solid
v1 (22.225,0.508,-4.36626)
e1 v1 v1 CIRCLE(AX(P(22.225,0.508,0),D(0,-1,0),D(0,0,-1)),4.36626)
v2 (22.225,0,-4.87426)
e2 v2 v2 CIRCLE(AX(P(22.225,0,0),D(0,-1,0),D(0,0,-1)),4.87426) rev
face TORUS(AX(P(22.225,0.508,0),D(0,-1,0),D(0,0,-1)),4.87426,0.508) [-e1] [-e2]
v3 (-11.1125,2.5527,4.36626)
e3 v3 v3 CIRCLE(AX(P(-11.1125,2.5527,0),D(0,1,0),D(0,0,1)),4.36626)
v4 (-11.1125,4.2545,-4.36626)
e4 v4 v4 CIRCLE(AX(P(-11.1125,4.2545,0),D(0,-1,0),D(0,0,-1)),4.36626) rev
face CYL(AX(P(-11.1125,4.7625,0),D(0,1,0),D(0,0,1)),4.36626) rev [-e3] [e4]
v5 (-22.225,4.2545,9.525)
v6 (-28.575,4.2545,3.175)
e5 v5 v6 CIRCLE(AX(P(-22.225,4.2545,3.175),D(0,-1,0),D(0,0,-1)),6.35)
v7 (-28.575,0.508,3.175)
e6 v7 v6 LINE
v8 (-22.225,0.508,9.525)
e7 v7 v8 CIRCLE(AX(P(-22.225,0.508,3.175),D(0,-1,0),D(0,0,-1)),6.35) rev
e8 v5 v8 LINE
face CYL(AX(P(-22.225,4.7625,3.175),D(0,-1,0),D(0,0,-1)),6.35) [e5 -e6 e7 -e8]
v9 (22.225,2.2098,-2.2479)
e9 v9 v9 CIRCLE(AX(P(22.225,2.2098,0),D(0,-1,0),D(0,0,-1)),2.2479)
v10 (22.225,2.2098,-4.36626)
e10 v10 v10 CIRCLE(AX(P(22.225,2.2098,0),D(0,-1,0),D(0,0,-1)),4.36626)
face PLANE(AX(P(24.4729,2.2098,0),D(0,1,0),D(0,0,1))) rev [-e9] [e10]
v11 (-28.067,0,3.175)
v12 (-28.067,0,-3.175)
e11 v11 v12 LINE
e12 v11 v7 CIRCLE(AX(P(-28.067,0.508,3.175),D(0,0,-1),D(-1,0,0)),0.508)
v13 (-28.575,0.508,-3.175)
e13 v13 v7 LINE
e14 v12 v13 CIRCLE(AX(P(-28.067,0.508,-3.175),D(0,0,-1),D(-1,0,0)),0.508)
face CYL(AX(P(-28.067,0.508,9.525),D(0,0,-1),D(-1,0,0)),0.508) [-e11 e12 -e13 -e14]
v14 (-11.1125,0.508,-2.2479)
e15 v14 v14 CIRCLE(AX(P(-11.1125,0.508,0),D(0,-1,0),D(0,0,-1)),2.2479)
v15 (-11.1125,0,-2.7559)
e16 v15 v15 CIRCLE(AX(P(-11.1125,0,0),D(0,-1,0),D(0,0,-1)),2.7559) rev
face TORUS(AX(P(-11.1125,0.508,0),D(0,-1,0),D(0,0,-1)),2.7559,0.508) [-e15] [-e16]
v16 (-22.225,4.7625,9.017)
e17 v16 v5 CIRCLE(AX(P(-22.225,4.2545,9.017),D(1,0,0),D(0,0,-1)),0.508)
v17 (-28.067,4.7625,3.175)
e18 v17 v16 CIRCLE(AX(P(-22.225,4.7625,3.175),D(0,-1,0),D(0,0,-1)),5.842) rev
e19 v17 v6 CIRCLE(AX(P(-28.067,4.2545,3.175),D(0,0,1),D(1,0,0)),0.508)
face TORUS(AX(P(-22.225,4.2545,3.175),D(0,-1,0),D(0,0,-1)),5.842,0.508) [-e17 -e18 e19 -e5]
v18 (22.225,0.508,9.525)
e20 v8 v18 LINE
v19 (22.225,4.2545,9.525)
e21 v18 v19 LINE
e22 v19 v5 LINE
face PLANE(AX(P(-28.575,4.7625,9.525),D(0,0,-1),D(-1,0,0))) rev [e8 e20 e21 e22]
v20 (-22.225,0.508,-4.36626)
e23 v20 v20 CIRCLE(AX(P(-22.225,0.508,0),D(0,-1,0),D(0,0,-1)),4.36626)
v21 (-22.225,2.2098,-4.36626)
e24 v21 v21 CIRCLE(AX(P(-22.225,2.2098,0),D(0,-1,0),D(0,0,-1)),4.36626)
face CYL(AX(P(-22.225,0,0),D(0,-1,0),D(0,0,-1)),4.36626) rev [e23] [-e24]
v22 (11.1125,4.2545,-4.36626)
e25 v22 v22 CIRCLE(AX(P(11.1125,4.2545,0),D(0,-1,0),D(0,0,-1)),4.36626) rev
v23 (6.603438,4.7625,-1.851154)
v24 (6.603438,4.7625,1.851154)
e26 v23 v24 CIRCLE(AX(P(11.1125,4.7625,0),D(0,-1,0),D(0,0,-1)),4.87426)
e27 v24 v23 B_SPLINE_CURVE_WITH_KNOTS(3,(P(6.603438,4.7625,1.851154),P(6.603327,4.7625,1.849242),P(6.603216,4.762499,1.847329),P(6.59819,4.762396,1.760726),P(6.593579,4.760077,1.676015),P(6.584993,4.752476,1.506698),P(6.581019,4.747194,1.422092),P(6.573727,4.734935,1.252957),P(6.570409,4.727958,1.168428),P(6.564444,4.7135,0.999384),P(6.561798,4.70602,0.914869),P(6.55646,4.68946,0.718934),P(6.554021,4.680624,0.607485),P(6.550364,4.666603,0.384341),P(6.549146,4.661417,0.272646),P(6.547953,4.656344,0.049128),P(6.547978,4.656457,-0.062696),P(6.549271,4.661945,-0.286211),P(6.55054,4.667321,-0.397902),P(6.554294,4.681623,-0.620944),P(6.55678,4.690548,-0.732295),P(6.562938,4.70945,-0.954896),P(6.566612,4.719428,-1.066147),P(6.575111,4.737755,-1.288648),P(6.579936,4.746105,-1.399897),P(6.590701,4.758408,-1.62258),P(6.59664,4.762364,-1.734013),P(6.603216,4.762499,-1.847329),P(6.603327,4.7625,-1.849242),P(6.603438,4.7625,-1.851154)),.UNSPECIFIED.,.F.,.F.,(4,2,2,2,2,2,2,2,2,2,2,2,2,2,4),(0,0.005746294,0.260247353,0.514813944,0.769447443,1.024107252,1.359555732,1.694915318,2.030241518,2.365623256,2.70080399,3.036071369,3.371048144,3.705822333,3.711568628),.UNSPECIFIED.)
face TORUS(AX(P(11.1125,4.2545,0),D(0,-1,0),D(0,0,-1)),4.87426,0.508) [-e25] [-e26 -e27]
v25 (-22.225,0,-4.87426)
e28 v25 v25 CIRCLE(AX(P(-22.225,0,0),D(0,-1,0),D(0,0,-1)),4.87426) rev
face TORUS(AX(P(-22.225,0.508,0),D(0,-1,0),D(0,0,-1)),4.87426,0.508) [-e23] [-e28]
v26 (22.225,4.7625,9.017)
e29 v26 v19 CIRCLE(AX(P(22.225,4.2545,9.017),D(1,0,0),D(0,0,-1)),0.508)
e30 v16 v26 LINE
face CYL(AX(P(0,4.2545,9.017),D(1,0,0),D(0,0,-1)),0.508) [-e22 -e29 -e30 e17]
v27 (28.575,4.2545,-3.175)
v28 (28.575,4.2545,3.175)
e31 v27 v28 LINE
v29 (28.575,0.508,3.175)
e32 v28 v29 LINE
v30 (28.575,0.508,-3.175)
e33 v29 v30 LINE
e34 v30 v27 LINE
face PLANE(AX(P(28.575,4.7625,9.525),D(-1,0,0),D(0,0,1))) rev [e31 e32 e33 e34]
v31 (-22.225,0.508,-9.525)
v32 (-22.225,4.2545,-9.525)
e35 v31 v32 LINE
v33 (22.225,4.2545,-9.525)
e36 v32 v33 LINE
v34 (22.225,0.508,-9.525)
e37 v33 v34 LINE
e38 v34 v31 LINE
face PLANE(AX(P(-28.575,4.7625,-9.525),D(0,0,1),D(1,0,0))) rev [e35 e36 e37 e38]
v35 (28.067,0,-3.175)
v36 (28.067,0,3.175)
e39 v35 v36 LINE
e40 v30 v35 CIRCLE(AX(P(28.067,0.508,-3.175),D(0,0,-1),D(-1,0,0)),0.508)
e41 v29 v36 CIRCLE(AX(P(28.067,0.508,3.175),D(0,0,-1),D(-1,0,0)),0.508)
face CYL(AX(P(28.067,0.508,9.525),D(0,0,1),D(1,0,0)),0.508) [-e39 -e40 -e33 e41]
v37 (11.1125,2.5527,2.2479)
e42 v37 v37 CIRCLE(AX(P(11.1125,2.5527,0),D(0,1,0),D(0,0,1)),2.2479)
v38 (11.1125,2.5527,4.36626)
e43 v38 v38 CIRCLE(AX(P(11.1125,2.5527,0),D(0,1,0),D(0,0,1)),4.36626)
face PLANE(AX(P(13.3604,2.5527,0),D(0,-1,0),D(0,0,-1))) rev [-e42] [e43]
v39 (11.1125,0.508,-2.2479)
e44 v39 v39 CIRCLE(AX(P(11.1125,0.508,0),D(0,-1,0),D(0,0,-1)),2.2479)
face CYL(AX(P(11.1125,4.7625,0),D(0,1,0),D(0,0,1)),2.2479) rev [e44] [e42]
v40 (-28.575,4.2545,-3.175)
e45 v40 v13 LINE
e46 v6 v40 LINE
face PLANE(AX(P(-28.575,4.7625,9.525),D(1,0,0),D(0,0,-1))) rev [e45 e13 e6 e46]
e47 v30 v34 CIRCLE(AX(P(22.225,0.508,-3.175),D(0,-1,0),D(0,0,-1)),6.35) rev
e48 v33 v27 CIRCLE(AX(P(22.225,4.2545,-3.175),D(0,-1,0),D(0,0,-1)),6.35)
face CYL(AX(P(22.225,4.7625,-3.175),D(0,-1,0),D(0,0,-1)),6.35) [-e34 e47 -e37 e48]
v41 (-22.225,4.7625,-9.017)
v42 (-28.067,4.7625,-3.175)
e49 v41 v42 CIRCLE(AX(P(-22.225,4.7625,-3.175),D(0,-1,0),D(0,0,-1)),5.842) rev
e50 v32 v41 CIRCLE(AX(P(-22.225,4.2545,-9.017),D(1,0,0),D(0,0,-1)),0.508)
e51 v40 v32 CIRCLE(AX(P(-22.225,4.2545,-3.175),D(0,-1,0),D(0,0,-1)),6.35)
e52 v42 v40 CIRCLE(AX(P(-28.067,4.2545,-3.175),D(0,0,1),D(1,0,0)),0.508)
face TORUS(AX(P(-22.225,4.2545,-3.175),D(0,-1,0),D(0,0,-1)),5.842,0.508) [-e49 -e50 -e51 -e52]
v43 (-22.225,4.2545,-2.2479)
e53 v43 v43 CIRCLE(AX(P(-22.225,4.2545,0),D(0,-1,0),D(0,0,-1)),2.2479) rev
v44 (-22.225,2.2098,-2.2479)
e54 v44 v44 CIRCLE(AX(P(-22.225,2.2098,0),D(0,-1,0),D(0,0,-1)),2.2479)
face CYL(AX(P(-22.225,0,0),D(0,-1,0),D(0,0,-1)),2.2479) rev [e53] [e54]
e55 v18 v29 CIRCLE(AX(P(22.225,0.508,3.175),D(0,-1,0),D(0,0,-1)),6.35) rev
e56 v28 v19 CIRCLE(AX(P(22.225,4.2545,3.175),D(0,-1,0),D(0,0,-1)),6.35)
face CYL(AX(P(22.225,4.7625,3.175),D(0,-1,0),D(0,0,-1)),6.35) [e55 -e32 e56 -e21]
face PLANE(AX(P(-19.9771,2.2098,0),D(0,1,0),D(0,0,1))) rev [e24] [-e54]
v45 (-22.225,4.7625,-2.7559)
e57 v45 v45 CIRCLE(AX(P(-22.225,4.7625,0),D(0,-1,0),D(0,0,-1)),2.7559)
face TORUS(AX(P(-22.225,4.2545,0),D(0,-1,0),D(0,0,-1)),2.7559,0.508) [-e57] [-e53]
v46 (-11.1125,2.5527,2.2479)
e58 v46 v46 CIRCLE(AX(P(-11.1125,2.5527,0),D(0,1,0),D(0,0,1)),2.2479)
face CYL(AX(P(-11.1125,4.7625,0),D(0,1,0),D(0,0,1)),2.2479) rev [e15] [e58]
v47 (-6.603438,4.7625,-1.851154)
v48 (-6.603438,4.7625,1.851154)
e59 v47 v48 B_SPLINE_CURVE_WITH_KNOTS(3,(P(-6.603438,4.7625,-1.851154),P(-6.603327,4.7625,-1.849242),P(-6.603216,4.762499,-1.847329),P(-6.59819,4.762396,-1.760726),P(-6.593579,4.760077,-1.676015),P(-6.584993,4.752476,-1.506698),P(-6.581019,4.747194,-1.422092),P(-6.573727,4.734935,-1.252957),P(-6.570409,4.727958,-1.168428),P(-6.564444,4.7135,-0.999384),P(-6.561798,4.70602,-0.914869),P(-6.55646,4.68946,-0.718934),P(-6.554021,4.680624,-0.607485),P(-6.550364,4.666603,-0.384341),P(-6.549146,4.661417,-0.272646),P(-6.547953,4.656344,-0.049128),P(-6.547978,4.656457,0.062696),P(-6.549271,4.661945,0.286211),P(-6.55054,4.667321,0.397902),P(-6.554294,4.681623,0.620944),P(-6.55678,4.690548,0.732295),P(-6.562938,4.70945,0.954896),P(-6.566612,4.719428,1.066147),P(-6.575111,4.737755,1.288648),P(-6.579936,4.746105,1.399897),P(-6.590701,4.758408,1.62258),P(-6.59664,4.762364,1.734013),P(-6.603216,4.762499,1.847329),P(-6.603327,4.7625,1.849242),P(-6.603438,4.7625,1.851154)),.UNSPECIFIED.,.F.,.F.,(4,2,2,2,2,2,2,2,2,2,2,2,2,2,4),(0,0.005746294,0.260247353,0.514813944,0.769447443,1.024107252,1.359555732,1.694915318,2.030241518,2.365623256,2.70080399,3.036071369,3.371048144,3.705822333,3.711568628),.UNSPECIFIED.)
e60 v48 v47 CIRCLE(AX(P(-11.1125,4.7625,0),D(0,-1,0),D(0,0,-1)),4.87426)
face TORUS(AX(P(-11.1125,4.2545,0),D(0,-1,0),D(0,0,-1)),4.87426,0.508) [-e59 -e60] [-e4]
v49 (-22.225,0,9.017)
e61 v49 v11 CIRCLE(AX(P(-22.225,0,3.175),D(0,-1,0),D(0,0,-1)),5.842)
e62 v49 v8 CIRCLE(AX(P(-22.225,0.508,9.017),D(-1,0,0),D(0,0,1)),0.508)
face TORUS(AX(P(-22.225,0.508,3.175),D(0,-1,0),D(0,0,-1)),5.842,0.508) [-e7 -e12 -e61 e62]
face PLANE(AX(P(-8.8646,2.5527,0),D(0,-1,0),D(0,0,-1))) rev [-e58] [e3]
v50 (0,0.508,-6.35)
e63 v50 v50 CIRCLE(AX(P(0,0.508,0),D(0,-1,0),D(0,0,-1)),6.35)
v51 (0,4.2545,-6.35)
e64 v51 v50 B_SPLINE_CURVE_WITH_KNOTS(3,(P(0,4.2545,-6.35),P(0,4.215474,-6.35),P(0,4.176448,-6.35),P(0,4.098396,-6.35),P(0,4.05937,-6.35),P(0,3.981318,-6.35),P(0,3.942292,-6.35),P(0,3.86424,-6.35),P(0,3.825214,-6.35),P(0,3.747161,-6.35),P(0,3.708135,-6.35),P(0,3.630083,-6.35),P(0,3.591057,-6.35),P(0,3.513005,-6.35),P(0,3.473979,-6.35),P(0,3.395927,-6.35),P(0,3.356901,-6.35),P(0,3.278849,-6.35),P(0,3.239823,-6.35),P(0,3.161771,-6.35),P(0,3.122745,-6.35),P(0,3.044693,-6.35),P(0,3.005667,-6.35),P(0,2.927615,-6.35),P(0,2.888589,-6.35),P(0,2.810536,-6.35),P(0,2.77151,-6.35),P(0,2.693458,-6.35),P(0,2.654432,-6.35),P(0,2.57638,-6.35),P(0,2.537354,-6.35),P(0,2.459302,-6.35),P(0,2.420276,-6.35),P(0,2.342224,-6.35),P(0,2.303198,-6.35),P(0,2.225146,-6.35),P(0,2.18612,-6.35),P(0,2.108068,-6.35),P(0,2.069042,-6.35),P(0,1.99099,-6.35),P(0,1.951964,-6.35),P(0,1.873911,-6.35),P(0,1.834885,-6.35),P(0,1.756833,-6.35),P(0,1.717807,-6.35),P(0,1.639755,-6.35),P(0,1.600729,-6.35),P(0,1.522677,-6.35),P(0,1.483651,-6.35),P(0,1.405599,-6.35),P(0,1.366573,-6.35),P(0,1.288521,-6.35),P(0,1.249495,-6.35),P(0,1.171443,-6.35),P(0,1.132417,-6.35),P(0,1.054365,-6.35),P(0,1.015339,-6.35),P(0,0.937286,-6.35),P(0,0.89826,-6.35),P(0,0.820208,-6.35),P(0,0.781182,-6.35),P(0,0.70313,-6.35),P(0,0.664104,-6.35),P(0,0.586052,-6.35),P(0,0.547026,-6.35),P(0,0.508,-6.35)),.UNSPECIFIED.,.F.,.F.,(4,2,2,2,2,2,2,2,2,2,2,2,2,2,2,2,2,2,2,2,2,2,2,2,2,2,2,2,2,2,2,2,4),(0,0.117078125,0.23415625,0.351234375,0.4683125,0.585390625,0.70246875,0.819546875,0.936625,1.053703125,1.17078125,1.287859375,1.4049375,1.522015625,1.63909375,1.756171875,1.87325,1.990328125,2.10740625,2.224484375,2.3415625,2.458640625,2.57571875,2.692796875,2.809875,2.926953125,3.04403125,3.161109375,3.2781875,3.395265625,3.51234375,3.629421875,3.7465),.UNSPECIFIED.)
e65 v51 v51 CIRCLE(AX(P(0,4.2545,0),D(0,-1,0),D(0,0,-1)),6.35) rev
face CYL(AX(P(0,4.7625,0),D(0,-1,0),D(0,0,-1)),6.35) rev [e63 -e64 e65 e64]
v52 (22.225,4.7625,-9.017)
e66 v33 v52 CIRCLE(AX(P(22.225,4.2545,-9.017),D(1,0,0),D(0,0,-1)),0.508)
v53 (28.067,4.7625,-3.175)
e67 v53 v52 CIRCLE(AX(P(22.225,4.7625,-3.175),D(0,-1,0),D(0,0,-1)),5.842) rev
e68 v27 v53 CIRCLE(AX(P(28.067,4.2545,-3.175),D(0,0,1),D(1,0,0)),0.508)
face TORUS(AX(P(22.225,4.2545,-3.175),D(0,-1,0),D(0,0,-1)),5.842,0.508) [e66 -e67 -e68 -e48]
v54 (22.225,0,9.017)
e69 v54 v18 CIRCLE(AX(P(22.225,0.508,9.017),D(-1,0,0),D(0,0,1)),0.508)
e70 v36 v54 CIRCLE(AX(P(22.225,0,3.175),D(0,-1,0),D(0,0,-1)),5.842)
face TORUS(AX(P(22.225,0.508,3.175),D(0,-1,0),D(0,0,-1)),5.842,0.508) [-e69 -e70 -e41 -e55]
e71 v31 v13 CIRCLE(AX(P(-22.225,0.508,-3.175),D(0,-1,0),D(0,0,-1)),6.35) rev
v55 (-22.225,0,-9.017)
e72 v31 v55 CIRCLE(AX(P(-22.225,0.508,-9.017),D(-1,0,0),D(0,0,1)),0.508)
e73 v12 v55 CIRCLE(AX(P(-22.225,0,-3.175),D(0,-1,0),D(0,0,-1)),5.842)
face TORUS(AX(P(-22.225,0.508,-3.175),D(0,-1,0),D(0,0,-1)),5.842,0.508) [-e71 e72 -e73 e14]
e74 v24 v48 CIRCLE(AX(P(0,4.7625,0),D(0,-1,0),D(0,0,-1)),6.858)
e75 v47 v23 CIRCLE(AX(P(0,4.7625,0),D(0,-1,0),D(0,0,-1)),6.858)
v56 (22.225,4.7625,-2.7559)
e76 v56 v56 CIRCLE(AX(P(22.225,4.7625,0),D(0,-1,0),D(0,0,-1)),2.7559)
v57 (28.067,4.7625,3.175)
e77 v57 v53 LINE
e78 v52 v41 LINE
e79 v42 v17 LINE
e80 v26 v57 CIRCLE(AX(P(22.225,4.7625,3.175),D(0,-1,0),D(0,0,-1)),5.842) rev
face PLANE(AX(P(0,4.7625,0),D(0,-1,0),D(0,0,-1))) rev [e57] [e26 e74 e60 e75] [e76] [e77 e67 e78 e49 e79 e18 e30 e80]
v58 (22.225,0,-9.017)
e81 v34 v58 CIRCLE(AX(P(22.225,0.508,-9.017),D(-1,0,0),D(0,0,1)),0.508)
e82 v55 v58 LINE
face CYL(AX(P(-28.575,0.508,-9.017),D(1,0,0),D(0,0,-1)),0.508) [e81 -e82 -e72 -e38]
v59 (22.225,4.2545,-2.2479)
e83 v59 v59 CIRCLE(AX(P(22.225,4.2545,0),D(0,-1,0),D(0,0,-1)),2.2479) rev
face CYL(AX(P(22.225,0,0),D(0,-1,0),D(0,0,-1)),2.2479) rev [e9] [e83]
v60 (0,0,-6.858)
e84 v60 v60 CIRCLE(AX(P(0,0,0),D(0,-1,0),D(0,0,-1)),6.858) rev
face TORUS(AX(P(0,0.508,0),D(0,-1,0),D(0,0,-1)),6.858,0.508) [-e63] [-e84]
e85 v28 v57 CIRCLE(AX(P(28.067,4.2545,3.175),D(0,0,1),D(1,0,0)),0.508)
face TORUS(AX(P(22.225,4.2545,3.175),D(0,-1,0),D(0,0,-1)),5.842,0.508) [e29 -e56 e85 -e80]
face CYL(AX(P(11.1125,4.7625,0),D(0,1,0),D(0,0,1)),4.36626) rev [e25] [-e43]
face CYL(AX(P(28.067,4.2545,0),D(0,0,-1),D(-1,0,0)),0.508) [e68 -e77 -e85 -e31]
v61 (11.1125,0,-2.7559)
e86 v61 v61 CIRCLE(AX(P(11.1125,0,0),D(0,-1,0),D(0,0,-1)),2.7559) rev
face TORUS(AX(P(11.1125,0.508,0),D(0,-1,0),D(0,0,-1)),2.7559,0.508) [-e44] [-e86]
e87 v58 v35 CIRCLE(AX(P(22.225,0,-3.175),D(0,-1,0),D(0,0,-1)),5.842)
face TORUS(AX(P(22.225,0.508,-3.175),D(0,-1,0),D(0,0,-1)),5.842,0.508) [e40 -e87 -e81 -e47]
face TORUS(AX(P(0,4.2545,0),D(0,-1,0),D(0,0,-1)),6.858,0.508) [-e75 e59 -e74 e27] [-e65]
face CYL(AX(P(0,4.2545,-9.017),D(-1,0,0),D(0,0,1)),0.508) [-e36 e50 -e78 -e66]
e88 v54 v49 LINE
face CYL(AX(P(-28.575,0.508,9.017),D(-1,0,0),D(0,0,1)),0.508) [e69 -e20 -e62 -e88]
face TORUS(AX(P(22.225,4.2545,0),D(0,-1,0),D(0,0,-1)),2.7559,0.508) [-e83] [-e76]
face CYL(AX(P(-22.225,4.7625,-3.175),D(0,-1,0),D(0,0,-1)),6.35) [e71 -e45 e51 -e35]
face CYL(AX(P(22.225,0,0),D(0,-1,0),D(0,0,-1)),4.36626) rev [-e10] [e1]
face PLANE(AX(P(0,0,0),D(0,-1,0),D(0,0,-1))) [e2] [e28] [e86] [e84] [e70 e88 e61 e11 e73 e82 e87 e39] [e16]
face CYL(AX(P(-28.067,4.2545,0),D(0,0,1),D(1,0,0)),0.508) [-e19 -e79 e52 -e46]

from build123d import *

# Parameters (mm, degrees)
SKETCH1_W                                      = 57.15
SKETCH1_H                                      = 19.05
SKETCH1_R                                      = 6.35
BOSS_EXTRUDE1_DEPTH                            = 4.7625
CBORE_FOR_8_BUTTON_HEAD_CAP_SCREW1_D           = 4.4958
CBORE_FOR_8_BUTTON_HEAD_CAP_SCREW1_CBORE_D     = 8.73252
CBORE_FOR_8_BUTTON_HEAD_CAP_SCREW1_CBORE_DEPTH = 2.2098
CBORE_FOR_8_BUTTON_HEAD_CAP_SCREW2_D           = 4.4958
CBORE_FOR_8_BUTTON_HEAD_CAP_SCREW2_CBORE_D     = 8.73252
CBORE_FOR_8_BUTTON_HEAD_CAP_SCREW2_CBORE_DEPTH = 2.2098
FILLET1_R                                      = 6.35
FILLET2_R                                      = 0.508


with BuildPart() as part:
    # Sketch1 → Boss-Extrude1 (new body)
    with BuildSketch(Plane(origin=(0, 0, 0), x_dir=(1, 0, 0), z_dir=(0, 1, 0))):
        Rectangle(SKETCH1_W, SKETCH1_H)
        with Locations(Location((0, 0, 0), (0, 0, 90))):
            Circle(SKETCH1_R, mode=Mode.SUBTRACT)
    extrude(amount=BOSS_EXTRUDE1_DEPTH)

    # CBORE for #8 Button Head Cap Screw1 (through all)
    with Locations(Plane(origin=(0, 4.7625, 0), x_dir=(1, 0, 0), z_dir=(0, 1, 0))):
        with Locations((-11.1125, 0), (11.1125, 0)):
            CounterBoreHole(CBORE_FOR_8_BUTTON_HEAD_CAP_SCREW1_D / 2, CBORE_FOR_8_BUTTON_HEAD_CAP_SCREW1_CBORE_D / 2, CBORE_FOR_8_BUTTON_HEAD_CAP_SCREW1_CBORE_DEPTH)

    # CBORE for #8 Button Head Cap Screw2 (through all)
    with Locations(Plane(origin=(0, 0, 0), x_dir=(-1, 0, 0), z_dir=(0, -1, 0))):
        with Locations((22.225, 0), (-22.225, 0)):
            CounterBoreHole(CBORE_FOR_8_BUTTON_HEAD_CAP_SCREW2_D / 2, CBORE_FOR_8_BUTTON_HEAD_CAP_SCREW2_CBORE_D / 2, CBORE_FOR_8_BUTTON_HEAD_CAP_SCREW2_CBORE_DEPTH)

    # Fillet1
    fillet1_edges = [part.edges().sort_by_distance(p)[0] for p in [
        (28.575, 2.38125, 9.525),
        (-28.575, 2.38125, 9.525),
        (-28.575, 2.38125, -9.525),
        (28.575, 2.38125, -9.525),
    ]]
    fillet(fillet1_edges, radius=FILLET1_R)

    # Fillet2
    # the kernel refuses this fillet: 0.508 mm, written as the material it takes off along each edge
    with BuildSketch(Plane(origin=(0, 0, 0), x_dir=(0, 0, -1), z_dir=(1, 0, 0))) as fillet2_piece_1:
        with BuildLine():
            CenterArc((6.35 + FILLET2_R, FILLET2_R), FILLET2_R, 180, 90)
            Line((6.35, FILLET2_R), (6.35, 0))
            Line((6.35, 0), (6.35 + FILLET2_R, 0))
        make_face()
    revolve(axis=Axis((0, 0, 0), (0, 1, 0)), mode=Mode.SUBTRACT)
    with BuildSketch(Plane(origin=(0, 4.7625, 0), x_dir=(0, 0, -1), z_dir=(1, 0, 0))) as fillet2_piece_2:
        with BuildLine():
            CenterArc((6.35 + FILLET2_R, -FILLET2_R), FILLET2_R, 90, 90)
            Line((6.35, -FILLET2_R), (6.35, 0))
            Line((6.35, 0), (6.35 + FILLET2_R, 0))
        make_face()
    revolve(axis=Axis((0, 4.7625, 0), (0, 1, 0)), mode=Mode.SUBTRACT)
    with BuildSketch(Plane(origin=(11.1125, 4.7625, 0), x_dir=(1, 0, 0), z_dir=(0, 0, 1))) as fillet2_piece_3:
        with BuildLine():
            CenterArc((4.36626 + FILLET2_R, -FILLET2_R), FILLET2_R, 90, 90)
            Line((4.36626, -FILLET2_R), (4.36626, 0))
            Line((4.36626, 0), (4.36626 + FILLET2_R, 0))
        make_face()
    revolve(axis=Axis((11.1125, 4.7625, 0), (0, 1, 0)), mode=Mode.SUBTRACT)
    with BuildSketch(Plane(origin=(11.1125, 0, 0), x_dir=(-1, 0, 0), z_dir=(0, 0, 1))) as fillet2_piece_4:
        with BuildLine():
            CenterArc((2.2479 + FILLET2_R, -FILLET2_R), FILLET2_R, 90, 90)
            Line((2.2479, -FILLET2_R), (2.2479, 0))
            Line((2.2479, 0), (2.2479 + FILLET2_R, 0))
        make_face()
    revolve(axis=Axis((11.1125, 0, 0), (0, -1, 0)), mode=Mode.SUBTRACT)
    with BuildSketch(Plane(origin=(-11.1125, 4.7625, 0), x_dir=(1, 0, 0), z_dir=(0, 0, 1))) as fillet2_piece_5:
        with BuildLine():
            CenterArc((4.36626 + FILLET2_R, -FILLET2_R), FILLET2_R, 90, 90)
            Line((4.36626, -FILLET2_R), (4.36626, 0))
            Line((4.36626, 0), (4.36626 + FILLET2_R, 0))
        make_face()
    revolve(axis=Axis((-11.1125, 4.7625, 0), (0, 1, 0)), mode=Mode.SUBTRACT)
    with BuildSketch(Plane(origin=(-11.1125, 0, 0), x_dir=(-1, 0, 0), z_dir=(0, 0, 1))) as fillet2_piece_6:
        with BuildLine():
            CenterArc((2.2479 + FILLET2_R, -FILLET2_R), FILLET2_R, 90, 90)
            Line((2.2479, -FILLET2_R), (2.2479, 0))
            Line((2.2479, 0), (2.2479 + FILLET2_R, 0))
        make_face()
    revolve(axis=Axis((-11.1125, 0, 0), (0, -1, 0)), mode=Mode.SUBTRACT)
    with BuildSketch(Plane(origin=(22.225, 0, 0), x_dir=(-1, 0, 0), z_dir=(0, 0, 1))) as fillet2_piece_7:
        with BuildLine():
            CenterArc((4.36626 + FILLET2_R, -FILLET2_R), FILLET2_R, 90, 90)
            Line((4.36626, -FILLET2_R), (4.36626, 0))
            Line((4.36626, 0), (4.36626 + FILLET2_R, 0))
        make_face()
    revolve(axis=Axis((22.225, 0, 0), (0, -1, 0)), mode=Mode.SUBTRACT)
    with BuildSketch(Plane(origin=(22.225, 4.7625, 0), x_dir=(1, 0, 0), z_dir=(0, 0, 1))) as fillet2_piece_8:
        with BuildLine():
            CenterArc((2.2479 + FILLET2_R, -FILLET2_R), FILLET2_R, 90, 90)
            Line((2.2479, -FILLET2_R), (2.2479, 0))
            Line((2.2479, 0), (2.2479 + FILLET2_R, 0))
        make_face()
    revolve(axis=Axis((22.225, 4.7625, 0), (0, 1, 0)), mode=Mode.SUBTRACT)
    with BuildSketch(Plane(origin=(-22.225, 0, 0), x_dir=(-1, 0, 0), z_dir=(0, 0, 1))) as fillet2_piece_9:
        with BuildLine():
            CenterArc((4.36626 + FILLET2_R, -FILLET2_R), FILLET2_R, 90, 90)
            Line((4.36626, -FILLET2_R), (4.36626, 0))
            Line((4.36626, 0), (4.36626 + FILLET2_R, 0))
        make_face()
    revolve(axis=Axis((-22.225, 0, 0), (0, -1, 0)), mode=Mode.SUBTRACT)
    with BuildSketch(Plane(origin=(-22.225, 4.7625, 0), x_dir=(1, 0, 0), z_dir=(0, 0, 1))) as fillet2_piece_10:
        with BuildLine():
            CenterArc((2.2479 + FILLET2_R, -FILLET2_R), FILLET2_R, 90, 90)
            Line((2.2479, -FILLET2_R), (2.2479, 0))
            Line((2.2479, 0), (2.2479 + FILLET2_R, 0))
        make_face()
    revolve(axis=Axis((-22.225, 4.7625, 0), (0, 1, 0)), mode=Mode.SUBTRACT)
    with BuildSketch(Plane(origin=(22.225, 0, -9.525), x_dir=(0, 0, 1), z_dir=(-1, 0, 0)), Plane(origin=(-22.225, 4.7625, 9.525), x_dir=(0, -1, 0), z_dir=(1, 0, 0))) as fillet2_piece_11:
        with BuildLine():
            CenterArc((FILLET2_R, FILLET2_R), FILLET2_R, 180, 90)
            Line((0, FILLET2_R), (0, 0))
            Line((0, 0), (FILLET2_R, 0))
        make_face()
    extrude(amount=44.45, mode=Mode.SUBTRACT)
    with BuildSketch(Plane(origin=(22.225, 4.7625, -9.525), x_dir=(0, 0, 1), z_dir=(-1, 0, 0)), Plane(origin=(-22.225, 0, 9.525), x_dir=(0, 1, 0), z_dir=(1, 0, 0))) as fillet2_piece_12:
        with BuildLine():
            CenterArc((FILLET2_R, -FILLET2_R), FILLET2_R, 90, 90)
            Line((0, -FILLET2_R), (0, 0))
            Line((0, 0), (FILLET2_R, 0))
        make_face()
    extrude(amount=44.45, mode=Mode.SUBTRACT)
    with BuildSketch(Plane(origin=(28.575, 0, 3.175), x_dir=(-1, 0, 0), z_dir=(0, 0, -1)), Plane(origin=(-28.575, 0, -3.175), x_dir=(1, 0, 0), z_dir=(0, 0, 1))) as fillet2_piece_13:
        with BuildLine():
            CenterArc((FILLET2_R, FILLET2_R), FILLET2_R, 180, 90)
            Line((0, FILLET2_R), (0, 0))
            Line((0, 0), (FILLET2_R, 0))
        make_face()
    extrude(amount=6.35, mode=Mode.SUBTRACT)
    with BuildSketch(Plane(origin=(-22.225, 0, 3.175), x_dir=(0, 0, 1), z_dir=(1, 0, 0))) as fillet2_piece_14:
        with BuildLine():
            CenterArc((6.35 - FILLET2_R, -FILLET2_R), FILLET2_R, 0, 90)
            Line((6.35, -FILLET2_R), (6.35, 0))
            Line((6.35, 0), (6.35 - FILLET2_R, 0))
        make_face()
    revolve(axis=Axis((-22.225, 0, 3.175), (0, -1, 0)), revolution_arc=90, mode=Mode.SUBTRACT)
    with BuildSketch(Plane(origin=(-22.225, 0, -3.175), x_dir=(-1, 0, 0), z_dir=(0, 0, 1))) as fillet2_piece_15:
        with BuildLine():
            CenterArc((6.35 - FILLET2_R, -FILLET2_R), FILLET2_R, 0, 90)
            Line((6.35, -FILLET2_R), (6.35, 0))
            Line((6.35, 0), (6.35 - FILLET2_R, 0))
        make_face()
    revolve(axis=Axis((-22.225, 0, -3.175), (0, -1, 0)), revolution_arc=90, mode=Mode.SUBTRACT)
    with BuildSketch(Plane(origin=(22.225, 0, 3.175), x_dir=(0, 0, 1), z_dir=(-1, 0, 0))) as fillet2_piece_16:
        with BuildLine():
            CenterArc((6.35 - FILLET2_R, FILLET2_R), FILLET2_R, 270, 90)
            Line((6.35, FILLET2_R), (6.35, 0))
            Line((6.35, 0), (6.35 - FILLET2_R, 0))
        make_face()
    revolve(axis=Axis((22.225, 0, 3.175), (0, 1, 0)), revolution_arc=90, mode=Mode.SUBTRACT)
    with BuildSketch(Plane(origin=(22.225, 0, -3.175), x_dir=(1, 0, 0), z_dir=(0, 0, 1))) as fillet2_piece_17:
        with BuildLine():
            CenterArc((6.35 - FILLET2_R, FILLET2_R), FILLET2_R, 270, 90)
            Line((6.35, FILLET2_R), (6.35, 0))
            Line((6.35, 0), (6.35 - FILLET2_R, 0))
        make_face()
    revolve(axis=Axis((22.225, 0, -3.175), (0, 1, 0)), revolution_arc=90, mode=Mode.SUBTRACT)
    with BuildSketch(Plane(origin=(28.575, 4.7625, 3.175), x_dir=(-1, 0, 0), z_dir=(0, 0, -1)), Plane(origin=(-28.575, 4.7625, -3.175), x_dir=(1, 0, 0), z_dir=(0, 0, 1))) as fillet2_piece_18:
        with BuildLine():
            CenterArc((FILLET2_R, -FILLET2_R), FILLET2_R, 90, 90)
            Line((0, -FILLET2_R), (0, 0))
            Line((0, 0), (FILLET2_R, 0))
        make_face()
    extrude(amount=6.35, mode=Mode.SUBTRACT)
    with BuildSketch(Plane(origin=(-22.225, 4.7625, 3.175), x_dir=(0, 0, 1), z_dir=(1, 0, 0))) as fillet2_piece_19:
        with BuildLine():
            CenterArc((6.35 - FILLET2_R, FILLET2_R), FILLET2_R, 270, 90)
            Line((6.35 - FILLET2_R, 0), (6.35, 0))
            Line((6.35, 0), (6.35, FILLET2_R))
        make_face()
    revolve(axis=Axis((-22.225, 4.7625, 3.175), (0, -1, 0)), revolution_arc=90, mode=Mode.SUBTRACT)
    with BuildSketch(Plane(origin=(-22.225, 4.7625, -3.175), x_dir=(-1, 0, 0), z_dir=(0, 0, 1))) as fillet2_piece_20:
        with BuildLine():
            CenterArc((6.35 - FILLET2_R, FILLET2_R), FILLET2_R, 270, 90)
            Line((6.35, FILLET2_R), (6.35, 0))
            Line((6.35, 0), (6.35 - FILLET2_R, 0))
        make_face()
    revolve(axis=Axis((-22.225, 4.7625, -3.175), (0, -1, 0)), revolution_arc=90, mode=Mode.SUBTRACT)
    with BuildSketch(Plane(origin=(22.225, 4.7625, 3.175), x_dir=(0, 0, 1), z_dir=(-1, 0, 0))) as fillet2_piece_21:
        with BuildLine():
            CenterArc((6.35 - FILLET2_R, -FILLET2_R), FILLET2_R, 0, 90)
            Line((6.35 - FILLET2_R, 0), (6.35, 0))
            Line((6.35, 0), (6.35, -FILLET2_R))
        make_face()
    revolve(axis=Axis((22.225, 4.7625, 3.175), (0, 1, 0)), revolution_arc=90, mode=Mode.SUBTRACT)
    with BuildSketch(Plane(origin=(22.225, 4.7625, -3.175), x_dir=(1, 0, 0), z_dir=(0, 0, 1))) as fillet2_piece_22:
        with BuildLine():
            CenterArc((6.35 - FILLET2_R, -FILLET2_R), FILLET2_R, 0, 90)
            Line((6.35, -FILLET2_R), (6.35, 0))
            Line((6.35, 0), (6.35 - FILLET2_R, 0))
        make_face()
    revolve(axis=Axis((22.225, 4.7625, -3.175), (0, 1, 0)), revolution_arc=90, mode=Mode.SUBTRACT)


solid = part.part
